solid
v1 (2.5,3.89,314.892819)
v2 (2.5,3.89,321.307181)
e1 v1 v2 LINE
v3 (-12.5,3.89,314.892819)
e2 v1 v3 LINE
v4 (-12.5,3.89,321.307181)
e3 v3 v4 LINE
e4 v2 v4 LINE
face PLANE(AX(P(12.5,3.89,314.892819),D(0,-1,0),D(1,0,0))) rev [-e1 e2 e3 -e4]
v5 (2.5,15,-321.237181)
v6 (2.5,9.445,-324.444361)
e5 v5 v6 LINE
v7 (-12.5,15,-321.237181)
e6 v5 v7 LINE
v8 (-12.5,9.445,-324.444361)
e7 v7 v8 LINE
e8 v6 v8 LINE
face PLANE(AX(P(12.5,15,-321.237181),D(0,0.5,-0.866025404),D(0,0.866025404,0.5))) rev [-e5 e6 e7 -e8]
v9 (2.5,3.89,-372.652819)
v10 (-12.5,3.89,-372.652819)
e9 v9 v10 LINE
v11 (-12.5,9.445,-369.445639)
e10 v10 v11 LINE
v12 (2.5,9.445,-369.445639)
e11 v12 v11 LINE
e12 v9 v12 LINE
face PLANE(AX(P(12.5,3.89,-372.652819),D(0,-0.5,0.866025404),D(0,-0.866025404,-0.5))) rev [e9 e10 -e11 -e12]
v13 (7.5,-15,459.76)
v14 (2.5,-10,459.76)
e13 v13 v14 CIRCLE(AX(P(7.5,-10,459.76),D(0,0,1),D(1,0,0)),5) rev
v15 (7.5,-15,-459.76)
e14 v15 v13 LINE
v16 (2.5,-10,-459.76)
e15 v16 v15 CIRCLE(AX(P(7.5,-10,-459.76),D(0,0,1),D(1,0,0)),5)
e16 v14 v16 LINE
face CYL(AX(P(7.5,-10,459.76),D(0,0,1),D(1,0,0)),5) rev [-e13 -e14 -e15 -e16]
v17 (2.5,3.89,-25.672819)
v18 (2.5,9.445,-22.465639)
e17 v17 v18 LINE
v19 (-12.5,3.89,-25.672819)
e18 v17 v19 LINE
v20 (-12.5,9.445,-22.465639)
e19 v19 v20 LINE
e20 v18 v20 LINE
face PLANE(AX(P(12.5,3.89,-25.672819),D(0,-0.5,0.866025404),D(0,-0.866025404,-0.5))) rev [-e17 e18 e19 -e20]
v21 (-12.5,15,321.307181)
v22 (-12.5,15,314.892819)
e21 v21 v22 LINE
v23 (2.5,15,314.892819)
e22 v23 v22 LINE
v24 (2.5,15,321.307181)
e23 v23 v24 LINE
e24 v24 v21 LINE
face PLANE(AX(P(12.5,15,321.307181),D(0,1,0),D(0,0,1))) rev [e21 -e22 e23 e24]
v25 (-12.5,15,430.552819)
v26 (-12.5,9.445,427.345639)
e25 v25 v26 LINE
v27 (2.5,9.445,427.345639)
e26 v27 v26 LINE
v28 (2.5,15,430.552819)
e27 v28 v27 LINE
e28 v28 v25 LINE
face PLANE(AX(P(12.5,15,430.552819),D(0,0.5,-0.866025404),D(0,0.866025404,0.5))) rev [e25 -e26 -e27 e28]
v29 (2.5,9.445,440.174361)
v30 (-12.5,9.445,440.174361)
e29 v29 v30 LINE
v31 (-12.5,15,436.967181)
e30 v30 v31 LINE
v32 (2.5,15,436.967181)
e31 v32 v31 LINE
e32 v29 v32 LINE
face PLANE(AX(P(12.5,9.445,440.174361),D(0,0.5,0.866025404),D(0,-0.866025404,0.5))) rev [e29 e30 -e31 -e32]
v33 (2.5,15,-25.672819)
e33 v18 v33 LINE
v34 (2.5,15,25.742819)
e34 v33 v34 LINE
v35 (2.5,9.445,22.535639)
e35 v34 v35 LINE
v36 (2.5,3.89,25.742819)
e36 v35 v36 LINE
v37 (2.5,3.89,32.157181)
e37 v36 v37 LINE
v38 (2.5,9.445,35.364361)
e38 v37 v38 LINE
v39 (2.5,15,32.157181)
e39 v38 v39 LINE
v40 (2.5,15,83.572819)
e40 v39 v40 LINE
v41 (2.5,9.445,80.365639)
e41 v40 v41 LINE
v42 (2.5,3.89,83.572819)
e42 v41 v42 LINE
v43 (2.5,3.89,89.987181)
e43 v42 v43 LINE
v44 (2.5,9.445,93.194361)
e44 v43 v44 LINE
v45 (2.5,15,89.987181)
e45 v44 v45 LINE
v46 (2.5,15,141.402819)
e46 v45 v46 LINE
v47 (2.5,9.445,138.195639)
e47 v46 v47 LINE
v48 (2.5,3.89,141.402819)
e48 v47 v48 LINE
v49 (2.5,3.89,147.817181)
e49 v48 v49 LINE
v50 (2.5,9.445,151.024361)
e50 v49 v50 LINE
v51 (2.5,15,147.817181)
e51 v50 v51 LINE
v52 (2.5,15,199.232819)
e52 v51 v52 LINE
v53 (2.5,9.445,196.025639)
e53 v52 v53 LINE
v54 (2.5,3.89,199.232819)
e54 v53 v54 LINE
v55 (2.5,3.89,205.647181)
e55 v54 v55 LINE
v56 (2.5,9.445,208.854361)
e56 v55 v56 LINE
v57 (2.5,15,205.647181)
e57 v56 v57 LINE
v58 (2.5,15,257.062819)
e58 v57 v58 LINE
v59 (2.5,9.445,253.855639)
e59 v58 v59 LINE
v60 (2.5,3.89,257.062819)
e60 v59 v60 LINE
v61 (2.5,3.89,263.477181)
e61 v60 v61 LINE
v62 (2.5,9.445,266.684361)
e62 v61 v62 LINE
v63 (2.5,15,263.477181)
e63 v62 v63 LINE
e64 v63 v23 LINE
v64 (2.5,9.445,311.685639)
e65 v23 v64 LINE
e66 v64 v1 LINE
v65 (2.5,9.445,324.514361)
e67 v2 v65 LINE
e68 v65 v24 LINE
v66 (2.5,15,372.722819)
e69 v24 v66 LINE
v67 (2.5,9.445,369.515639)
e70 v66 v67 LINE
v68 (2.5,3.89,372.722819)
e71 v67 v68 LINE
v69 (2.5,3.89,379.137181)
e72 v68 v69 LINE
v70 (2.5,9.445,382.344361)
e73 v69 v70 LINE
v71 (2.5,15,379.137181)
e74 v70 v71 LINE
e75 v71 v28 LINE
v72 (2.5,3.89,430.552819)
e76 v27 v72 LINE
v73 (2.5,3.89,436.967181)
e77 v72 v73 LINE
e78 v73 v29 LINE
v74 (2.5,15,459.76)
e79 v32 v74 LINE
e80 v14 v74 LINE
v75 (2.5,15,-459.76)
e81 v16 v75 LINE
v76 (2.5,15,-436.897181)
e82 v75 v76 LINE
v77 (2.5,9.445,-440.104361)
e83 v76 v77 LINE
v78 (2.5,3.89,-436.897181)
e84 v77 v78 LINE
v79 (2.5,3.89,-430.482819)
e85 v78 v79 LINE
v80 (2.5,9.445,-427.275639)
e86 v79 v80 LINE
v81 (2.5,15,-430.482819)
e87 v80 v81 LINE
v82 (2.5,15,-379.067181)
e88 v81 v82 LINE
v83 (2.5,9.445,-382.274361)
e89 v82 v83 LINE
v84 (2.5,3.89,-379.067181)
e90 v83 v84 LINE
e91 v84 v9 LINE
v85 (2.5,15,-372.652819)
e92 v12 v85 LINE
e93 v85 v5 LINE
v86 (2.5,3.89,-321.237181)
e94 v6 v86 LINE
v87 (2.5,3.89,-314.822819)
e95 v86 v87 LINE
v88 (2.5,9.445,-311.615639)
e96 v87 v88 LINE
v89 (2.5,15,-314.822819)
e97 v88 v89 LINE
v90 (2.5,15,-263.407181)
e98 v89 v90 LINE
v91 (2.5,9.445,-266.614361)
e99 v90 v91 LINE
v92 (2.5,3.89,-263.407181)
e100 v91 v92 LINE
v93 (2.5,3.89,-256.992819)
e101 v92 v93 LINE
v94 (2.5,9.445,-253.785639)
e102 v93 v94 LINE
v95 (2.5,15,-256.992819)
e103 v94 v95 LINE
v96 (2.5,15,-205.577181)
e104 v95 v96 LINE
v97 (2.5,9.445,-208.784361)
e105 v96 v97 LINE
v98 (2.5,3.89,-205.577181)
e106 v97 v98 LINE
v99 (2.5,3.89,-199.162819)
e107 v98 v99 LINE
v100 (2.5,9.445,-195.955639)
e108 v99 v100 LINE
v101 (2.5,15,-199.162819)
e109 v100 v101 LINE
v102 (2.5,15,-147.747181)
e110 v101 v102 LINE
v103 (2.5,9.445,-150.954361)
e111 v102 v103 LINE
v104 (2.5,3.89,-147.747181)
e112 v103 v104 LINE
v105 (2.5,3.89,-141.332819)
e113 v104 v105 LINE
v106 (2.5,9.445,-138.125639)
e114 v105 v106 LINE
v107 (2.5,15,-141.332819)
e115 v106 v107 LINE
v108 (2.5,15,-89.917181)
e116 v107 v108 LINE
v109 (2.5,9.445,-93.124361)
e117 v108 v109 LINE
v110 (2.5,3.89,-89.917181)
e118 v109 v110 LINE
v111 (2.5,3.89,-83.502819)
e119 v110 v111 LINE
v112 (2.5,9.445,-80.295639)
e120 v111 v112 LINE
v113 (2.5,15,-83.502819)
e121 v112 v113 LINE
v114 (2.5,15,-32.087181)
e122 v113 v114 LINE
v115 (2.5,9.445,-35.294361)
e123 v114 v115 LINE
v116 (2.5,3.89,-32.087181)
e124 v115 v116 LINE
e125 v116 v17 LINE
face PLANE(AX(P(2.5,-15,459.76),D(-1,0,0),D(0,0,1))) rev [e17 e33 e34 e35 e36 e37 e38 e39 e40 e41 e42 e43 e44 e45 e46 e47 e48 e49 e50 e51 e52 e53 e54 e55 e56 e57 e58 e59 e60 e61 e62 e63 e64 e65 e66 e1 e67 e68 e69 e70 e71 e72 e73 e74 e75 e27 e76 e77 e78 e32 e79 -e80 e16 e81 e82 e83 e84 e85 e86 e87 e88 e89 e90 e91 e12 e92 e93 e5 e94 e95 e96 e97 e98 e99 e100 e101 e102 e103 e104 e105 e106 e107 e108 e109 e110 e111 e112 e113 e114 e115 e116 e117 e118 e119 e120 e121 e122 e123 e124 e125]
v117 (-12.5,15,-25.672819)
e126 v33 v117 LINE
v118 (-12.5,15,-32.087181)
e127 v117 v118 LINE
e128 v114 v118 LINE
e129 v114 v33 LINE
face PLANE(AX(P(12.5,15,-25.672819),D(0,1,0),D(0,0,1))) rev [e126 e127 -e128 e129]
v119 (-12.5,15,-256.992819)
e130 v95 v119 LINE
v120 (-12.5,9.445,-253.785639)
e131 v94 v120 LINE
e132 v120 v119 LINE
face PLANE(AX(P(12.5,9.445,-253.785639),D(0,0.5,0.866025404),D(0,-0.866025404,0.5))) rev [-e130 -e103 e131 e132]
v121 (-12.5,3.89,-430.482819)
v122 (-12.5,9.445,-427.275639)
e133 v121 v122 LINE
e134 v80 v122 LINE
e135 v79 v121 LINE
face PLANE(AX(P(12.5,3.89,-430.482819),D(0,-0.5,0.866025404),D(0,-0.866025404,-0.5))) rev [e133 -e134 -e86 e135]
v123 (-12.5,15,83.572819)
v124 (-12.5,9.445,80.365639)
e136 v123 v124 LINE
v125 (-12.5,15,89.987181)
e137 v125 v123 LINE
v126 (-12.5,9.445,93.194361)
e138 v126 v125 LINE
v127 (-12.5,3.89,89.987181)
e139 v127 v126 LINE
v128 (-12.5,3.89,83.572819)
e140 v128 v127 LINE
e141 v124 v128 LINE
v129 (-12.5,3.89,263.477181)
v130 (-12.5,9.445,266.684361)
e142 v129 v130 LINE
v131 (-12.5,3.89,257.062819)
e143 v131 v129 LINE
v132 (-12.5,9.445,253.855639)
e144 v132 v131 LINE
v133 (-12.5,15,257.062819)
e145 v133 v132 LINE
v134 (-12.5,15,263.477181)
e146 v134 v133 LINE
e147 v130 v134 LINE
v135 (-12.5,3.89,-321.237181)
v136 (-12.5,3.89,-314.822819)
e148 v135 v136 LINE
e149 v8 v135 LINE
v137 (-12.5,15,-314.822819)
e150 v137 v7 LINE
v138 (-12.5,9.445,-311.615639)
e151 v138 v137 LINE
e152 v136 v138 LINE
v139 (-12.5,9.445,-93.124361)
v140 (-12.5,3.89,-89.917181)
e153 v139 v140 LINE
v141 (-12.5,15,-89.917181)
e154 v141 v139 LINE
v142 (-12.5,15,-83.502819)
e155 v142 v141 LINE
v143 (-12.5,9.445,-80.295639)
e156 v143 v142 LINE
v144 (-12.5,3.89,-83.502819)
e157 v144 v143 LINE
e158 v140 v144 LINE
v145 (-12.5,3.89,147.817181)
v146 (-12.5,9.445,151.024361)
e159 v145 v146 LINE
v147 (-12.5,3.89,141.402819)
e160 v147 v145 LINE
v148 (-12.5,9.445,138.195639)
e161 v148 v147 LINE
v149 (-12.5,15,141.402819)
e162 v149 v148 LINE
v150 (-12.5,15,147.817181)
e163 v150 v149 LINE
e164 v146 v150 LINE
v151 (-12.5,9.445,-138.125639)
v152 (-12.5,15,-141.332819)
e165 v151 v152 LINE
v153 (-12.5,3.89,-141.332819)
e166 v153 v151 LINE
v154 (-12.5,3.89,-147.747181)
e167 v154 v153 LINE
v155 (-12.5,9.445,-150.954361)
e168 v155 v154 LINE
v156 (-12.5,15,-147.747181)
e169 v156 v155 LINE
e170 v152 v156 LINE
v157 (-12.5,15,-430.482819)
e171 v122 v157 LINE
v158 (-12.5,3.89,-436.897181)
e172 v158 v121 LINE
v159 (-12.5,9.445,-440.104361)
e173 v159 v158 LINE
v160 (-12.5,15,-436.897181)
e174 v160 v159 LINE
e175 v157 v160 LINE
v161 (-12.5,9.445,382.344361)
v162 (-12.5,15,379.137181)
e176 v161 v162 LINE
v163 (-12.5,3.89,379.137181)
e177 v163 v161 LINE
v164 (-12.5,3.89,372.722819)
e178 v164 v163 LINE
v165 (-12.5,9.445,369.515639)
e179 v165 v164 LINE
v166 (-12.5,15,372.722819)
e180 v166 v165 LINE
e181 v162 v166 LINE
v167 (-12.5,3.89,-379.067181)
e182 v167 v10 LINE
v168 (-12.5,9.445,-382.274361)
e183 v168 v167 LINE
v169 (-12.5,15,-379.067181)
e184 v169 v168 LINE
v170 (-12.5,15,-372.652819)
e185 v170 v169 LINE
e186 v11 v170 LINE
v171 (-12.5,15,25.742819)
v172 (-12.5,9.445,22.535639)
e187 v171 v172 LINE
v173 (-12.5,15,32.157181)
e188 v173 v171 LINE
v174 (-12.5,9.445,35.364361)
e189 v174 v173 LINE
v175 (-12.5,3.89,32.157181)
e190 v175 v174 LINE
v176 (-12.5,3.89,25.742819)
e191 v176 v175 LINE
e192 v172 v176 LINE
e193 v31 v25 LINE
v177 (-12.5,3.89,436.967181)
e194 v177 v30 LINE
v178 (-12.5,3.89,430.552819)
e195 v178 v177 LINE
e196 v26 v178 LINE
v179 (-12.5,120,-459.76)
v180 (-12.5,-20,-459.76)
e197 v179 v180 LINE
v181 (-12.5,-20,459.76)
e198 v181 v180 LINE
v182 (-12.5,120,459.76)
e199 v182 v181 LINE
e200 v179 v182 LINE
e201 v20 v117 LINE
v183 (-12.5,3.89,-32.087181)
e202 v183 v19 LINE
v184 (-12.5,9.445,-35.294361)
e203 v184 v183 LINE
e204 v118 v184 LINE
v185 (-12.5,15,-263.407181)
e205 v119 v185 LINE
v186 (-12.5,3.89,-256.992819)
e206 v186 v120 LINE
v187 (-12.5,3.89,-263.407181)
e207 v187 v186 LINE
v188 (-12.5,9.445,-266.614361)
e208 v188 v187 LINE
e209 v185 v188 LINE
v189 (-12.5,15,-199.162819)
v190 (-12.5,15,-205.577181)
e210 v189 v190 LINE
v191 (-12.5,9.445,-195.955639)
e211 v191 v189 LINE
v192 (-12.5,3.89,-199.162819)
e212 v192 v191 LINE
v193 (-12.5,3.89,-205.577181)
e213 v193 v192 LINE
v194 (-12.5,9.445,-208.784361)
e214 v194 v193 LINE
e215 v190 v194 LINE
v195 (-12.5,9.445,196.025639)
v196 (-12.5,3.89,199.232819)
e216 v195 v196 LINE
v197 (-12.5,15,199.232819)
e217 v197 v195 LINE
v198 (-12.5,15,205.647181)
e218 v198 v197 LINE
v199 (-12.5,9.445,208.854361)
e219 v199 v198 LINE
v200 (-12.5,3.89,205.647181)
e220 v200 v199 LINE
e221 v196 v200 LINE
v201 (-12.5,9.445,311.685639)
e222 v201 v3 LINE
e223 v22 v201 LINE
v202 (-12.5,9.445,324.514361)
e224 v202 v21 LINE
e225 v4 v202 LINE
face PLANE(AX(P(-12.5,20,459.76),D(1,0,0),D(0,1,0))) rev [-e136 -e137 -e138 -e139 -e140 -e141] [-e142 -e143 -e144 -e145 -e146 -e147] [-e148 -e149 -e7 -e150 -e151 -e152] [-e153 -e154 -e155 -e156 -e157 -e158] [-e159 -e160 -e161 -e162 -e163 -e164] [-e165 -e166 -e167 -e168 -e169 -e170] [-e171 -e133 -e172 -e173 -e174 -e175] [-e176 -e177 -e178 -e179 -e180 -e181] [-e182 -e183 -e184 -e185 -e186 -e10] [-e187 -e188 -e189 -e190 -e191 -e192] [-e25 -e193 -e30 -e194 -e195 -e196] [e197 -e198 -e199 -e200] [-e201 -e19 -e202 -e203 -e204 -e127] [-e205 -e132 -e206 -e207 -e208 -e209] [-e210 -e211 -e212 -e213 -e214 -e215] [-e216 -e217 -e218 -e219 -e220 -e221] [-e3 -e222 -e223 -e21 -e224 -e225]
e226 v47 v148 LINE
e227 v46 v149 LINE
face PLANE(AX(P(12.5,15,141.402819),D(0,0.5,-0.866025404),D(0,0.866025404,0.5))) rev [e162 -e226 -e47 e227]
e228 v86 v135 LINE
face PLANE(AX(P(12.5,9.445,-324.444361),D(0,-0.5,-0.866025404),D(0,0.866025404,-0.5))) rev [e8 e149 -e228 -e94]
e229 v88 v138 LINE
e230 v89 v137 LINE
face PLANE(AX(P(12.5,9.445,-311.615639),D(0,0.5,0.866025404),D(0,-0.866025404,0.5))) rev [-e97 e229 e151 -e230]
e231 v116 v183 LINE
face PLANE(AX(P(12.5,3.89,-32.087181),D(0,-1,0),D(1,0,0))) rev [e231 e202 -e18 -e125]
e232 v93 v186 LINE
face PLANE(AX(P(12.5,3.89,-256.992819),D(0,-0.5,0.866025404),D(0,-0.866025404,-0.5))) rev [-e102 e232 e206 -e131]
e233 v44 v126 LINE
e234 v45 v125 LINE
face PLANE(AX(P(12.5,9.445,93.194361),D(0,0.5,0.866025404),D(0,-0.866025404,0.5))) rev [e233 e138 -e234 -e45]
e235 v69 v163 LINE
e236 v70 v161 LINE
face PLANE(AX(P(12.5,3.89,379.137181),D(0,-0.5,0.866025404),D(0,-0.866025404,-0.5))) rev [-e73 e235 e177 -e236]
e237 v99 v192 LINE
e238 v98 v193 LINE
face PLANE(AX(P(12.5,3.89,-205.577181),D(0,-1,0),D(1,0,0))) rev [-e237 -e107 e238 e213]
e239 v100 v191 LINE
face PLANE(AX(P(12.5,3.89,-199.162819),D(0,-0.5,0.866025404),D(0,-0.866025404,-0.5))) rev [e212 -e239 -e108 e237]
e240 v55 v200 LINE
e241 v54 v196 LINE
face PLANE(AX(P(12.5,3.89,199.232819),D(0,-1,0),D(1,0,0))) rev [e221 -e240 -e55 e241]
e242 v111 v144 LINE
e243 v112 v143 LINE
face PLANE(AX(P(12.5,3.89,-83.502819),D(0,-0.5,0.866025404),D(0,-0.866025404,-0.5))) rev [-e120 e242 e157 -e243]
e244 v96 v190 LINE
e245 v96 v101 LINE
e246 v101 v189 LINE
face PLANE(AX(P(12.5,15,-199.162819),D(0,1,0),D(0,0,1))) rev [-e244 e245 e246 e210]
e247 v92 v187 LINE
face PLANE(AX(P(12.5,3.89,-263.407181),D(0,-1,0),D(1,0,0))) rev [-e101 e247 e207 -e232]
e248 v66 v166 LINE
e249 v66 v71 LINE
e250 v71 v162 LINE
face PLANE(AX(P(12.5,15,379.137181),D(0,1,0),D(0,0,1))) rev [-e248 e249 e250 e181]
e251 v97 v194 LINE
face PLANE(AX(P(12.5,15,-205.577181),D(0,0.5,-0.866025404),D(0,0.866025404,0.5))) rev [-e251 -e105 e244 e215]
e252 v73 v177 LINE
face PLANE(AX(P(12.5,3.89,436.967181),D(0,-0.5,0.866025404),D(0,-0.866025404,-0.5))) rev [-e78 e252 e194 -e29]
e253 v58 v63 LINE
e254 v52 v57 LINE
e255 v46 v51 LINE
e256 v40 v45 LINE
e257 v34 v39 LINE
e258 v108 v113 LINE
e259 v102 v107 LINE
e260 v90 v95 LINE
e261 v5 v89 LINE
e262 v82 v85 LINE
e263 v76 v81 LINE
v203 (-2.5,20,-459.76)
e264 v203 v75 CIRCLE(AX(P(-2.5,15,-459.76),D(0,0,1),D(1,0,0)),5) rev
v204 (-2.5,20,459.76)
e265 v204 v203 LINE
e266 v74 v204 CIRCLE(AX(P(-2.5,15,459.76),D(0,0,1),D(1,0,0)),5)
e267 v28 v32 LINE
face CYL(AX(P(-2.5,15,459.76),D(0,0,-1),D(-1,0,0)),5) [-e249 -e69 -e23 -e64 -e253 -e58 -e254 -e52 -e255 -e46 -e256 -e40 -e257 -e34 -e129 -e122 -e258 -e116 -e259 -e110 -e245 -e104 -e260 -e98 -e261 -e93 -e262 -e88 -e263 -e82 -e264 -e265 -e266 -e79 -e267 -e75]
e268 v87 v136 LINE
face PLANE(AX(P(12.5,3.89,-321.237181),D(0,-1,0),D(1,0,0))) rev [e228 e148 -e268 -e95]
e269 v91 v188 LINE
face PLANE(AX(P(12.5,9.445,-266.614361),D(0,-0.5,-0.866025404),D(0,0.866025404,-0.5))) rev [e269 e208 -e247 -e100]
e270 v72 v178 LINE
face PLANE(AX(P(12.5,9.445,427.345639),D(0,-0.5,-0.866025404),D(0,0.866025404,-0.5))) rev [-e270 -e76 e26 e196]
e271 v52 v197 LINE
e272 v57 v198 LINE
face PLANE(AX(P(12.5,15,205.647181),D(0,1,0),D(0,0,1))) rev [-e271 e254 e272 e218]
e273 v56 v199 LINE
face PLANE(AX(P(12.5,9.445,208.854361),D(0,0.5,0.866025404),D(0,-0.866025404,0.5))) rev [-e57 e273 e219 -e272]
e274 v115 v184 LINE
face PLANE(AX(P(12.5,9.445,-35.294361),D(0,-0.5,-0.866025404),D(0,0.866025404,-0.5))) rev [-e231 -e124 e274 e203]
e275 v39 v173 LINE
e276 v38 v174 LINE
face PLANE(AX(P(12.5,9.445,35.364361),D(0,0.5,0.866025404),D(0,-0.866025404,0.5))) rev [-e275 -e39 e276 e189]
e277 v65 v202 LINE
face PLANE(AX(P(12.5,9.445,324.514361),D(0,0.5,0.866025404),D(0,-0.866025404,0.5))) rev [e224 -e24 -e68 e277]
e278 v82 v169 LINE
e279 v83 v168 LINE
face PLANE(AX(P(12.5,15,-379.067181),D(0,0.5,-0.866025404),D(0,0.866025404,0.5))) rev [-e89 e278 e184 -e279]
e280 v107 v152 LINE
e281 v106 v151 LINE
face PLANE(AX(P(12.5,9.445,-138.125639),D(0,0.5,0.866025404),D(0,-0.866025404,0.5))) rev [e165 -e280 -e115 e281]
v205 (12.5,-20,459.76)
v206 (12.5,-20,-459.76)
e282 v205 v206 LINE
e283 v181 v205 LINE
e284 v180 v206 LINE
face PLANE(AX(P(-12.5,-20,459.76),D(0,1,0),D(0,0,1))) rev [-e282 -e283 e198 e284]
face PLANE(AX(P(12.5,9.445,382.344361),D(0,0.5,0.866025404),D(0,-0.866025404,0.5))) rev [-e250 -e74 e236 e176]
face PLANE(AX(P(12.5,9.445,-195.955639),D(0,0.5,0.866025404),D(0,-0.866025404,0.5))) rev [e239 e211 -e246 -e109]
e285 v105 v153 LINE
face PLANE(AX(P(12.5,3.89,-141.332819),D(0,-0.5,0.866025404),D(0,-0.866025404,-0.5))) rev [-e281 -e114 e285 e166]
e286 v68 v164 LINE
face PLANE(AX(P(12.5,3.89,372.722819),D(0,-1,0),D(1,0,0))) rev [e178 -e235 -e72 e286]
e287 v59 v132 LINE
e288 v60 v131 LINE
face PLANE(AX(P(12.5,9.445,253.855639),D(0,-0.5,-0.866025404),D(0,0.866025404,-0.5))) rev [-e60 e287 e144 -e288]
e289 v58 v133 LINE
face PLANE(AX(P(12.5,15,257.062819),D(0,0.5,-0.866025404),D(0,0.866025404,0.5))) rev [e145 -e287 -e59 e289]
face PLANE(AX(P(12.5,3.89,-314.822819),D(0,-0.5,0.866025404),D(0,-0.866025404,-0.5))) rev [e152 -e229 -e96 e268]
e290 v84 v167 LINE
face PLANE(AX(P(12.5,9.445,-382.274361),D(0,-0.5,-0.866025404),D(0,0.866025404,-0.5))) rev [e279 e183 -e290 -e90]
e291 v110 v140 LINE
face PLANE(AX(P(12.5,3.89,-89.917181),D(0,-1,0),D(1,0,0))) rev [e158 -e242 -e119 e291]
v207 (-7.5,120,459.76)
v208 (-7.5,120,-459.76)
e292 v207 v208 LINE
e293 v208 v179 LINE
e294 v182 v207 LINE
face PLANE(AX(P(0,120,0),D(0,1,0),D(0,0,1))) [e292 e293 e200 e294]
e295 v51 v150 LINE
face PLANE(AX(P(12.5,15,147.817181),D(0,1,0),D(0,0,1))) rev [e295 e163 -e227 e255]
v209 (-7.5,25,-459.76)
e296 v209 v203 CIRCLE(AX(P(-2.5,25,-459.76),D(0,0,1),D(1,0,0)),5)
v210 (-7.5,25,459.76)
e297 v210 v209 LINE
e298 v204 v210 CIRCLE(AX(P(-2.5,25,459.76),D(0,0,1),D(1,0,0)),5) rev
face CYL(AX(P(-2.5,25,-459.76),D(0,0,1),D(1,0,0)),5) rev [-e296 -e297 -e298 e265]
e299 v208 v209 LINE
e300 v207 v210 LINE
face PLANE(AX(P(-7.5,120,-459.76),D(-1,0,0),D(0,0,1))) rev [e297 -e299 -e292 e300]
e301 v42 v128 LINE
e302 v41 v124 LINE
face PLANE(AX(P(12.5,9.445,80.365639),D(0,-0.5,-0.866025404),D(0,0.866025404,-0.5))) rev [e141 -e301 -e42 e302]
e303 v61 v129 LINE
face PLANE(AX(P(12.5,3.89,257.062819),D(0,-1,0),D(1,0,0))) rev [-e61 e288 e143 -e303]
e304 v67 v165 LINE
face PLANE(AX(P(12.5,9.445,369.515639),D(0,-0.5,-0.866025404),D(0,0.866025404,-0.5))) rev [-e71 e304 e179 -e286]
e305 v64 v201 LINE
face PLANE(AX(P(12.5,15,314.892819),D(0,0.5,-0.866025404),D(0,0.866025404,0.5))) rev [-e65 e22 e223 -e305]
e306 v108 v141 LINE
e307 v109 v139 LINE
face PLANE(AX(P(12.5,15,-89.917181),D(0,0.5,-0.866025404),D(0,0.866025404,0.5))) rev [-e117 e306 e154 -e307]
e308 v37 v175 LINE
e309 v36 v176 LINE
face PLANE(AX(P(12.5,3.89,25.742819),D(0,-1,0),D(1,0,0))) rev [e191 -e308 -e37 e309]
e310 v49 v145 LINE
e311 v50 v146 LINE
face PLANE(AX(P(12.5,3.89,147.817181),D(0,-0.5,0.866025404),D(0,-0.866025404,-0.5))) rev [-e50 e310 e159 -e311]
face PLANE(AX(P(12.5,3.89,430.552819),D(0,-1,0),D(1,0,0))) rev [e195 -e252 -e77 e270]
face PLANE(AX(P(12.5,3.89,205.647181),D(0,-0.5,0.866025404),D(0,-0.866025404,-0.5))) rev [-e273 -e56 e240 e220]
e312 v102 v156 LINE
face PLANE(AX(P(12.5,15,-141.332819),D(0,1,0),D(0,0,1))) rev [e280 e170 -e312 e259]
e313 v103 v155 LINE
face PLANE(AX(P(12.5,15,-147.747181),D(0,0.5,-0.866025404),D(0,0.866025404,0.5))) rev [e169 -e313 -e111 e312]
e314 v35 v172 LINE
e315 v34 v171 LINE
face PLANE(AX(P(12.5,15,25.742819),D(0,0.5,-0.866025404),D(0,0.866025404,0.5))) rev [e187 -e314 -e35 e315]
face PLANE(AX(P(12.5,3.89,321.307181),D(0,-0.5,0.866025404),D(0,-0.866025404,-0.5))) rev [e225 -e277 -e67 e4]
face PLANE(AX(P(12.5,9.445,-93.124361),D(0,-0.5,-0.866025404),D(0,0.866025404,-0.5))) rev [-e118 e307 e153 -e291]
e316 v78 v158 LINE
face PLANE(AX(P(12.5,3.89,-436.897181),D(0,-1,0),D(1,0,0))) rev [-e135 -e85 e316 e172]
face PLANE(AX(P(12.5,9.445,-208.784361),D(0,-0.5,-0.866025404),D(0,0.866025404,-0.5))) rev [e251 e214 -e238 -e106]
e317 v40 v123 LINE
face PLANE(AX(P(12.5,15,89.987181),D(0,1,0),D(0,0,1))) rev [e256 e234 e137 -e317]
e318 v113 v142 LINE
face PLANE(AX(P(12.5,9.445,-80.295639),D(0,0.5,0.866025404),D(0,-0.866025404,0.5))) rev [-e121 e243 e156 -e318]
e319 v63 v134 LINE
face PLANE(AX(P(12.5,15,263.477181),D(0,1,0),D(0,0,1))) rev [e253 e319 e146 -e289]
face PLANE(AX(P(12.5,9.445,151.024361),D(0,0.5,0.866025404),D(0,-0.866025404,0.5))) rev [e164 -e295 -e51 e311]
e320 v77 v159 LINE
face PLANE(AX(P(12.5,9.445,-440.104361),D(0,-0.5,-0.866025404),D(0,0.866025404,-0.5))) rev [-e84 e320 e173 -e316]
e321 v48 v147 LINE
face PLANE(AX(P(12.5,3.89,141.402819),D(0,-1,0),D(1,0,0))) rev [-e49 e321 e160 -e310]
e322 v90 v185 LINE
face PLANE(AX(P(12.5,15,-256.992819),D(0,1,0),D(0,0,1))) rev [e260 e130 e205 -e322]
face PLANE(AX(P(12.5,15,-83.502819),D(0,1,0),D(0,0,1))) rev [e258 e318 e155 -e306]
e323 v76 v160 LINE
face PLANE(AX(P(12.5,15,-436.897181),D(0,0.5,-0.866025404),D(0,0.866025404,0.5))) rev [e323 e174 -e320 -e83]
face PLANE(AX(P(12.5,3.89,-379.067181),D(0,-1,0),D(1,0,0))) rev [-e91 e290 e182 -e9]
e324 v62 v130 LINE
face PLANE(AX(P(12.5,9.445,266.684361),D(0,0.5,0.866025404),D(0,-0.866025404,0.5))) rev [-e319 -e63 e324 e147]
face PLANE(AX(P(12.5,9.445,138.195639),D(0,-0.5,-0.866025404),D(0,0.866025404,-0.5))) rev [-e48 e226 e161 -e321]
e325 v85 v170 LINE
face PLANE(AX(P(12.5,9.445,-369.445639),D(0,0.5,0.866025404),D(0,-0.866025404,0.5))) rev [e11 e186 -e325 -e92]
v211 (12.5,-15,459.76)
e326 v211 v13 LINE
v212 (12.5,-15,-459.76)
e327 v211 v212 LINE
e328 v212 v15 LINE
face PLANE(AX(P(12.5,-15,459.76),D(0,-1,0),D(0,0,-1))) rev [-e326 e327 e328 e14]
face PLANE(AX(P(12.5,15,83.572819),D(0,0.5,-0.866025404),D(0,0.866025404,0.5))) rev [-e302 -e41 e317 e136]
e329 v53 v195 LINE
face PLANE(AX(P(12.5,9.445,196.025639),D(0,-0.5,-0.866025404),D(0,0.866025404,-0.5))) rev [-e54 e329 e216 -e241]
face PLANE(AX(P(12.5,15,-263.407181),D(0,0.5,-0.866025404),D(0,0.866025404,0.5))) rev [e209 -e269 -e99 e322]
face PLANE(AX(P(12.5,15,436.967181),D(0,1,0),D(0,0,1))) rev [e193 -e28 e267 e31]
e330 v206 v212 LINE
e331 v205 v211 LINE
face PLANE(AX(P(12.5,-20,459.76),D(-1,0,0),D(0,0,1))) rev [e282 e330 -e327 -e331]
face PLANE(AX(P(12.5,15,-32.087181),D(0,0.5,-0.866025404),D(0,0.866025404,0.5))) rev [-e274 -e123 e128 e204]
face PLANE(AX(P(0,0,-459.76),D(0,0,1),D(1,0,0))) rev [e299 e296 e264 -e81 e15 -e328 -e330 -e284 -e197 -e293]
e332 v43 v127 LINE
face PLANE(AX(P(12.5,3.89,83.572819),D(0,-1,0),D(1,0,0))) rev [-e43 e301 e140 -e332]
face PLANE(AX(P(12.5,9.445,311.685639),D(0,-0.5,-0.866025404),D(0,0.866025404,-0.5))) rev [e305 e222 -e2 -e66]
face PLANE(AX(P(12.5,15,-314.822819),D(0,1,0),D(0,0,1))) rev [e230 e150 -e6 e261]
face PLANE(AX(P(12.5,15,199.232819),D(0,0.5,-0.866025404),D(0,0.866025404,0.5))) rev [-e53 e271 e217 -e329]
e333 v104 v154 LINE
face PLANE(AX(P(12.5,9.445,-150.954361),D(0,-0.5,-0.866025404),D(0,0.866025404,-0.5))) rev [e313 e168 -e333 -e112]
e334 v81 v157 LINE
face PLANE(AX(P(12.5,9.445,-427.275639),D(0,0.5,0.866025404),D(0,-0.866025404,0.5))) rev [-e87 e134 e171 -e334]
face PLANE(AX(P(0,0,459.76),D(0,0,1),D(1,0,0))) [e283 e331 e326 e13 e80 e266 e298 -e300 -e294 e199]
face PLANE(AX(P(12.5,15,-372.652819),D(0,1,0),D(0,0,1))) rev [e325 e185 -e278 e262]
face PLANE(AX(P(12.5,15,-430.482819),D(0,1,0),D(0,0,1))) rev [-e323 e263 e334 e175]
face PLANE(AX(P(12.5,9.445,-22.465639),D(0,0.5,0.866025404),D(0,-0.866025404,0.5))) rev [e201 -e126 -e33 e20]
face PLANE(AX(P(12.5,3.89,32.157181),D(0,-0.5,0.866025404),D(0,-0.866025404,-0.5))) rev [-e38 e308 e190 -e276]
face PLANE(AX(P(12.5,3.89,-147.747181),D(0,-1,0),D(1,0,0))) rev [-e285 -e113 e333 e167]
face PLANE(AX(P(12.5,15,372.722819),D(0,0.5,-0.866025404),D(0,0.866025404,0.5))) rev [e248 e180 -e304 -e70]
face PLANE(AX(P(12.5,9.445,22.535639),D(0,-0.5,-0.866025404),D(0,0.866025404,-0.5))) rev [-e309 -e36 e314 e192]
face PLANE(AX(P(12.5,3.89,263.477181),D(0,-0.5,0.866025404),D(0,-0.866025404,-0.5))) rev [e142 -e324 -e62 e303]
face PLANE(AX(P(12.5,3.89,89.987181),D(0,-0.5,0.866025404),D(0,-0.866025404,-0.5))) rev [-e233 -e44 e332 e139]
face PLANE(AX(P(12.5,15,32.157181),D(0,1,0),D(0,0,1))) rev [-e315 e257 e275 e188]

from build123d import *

# Parameters (mm, degrees)
GENERAL_EXTRUDE_DEPTH       = 459.76
ROUNDING_R                  = 5
ROLLER_HOLDERS_DEPTH        = 461.873363952
SKETCH5_W                   = 5
SKETCH5_H                   = 919.52
GUARD_RAIL_DEPTH            = 100
GUARD_RAIL_SUPPORT_FILLET_R = 5


with BuildPart() as part:
    # Sketch2 → General extrude (new, symmetric)
    with BuildSketch(Plane.XY):
        Polygon((-12.5, 20), (-12.5, -20), (12.5, -20), (12.5, -15), (2.5, -15), (2.5, 20), align=None)
    extrude(amount=GENERAL_EXTRUDE_DEPTH, both=True)

    # Rounding
    rounding_edges = [part.edges().sort_by_distance(p)[0] for p in [
        (2.5, 20, 0),
        (2.5, -15, 0),
    ]]
    fillet(rounding_edges, radius=ROUNDING_R)

    # Sketch3 → Roller holders (cut, through all)
    with BuildSketch(Plane.ZY.offset(12.5)):
        Polygon((436.967180745, 3.89), (440.174361491, 9.445), (436.967180745, 15), (430.552819255, 15), (427.345638509, 9.445), (430.552819255, 3.89), align=None)
        Polygon((379.137180745, 3.89), (382.344361491, 9.445), (379.137180745, 15), (372.722819255, 15), (369.515638509, 9.445), (372.722819255, 3.89), align=None)
        Polygon((321.307180745, 3.89), (324.514361491, 9.445), (321.307180745, 15), (314.892819255, 15), (311.685638509, 9.445), (314.892819255, 3.89), align=None)
        Polygon((263.477180745, 3.89), (266.684361491, 9.445), (263.477180745, 15), (257.062819255, 15), (253.855638509, 9.445), (257.062819255, 3.89), align=None)
        Polygon((205.647180745, 3.89), (208.854361491, 9.445), (205.647180745, 15), (199.232819255, 15), (196.025638509, 9.445), (199.232819255, 3.89), align=None)
        Polygon((147.817180745, 3.89), (151.024361491, 9.445), (147.817180745, 15), (141.402819255, 15), (138.195638509, 9.445), (141.402819255, 3.89), align=None)
        Polygon((89.987180745, 3.89), (93.194361491, 9.445), (89.987180745, 15), (83.572819255, 15), (80.365638509, 9.445), (83.572819255, 3.89), align=None)
        Polygon((32.157180745, 3.89), (35.364361491, 9.445), (32.157180745, 15), (25.742819255, 15), (22.535638509, 9.445), (25.742819255, 3.89), align=None)
        Polygon((-25.672819255, 3.89), (-22.465638509, 9.445), (-25.672819255, 15), (-32.087180745, 15), (-35.294361491, 9.445), (-32.087180745, 3.89), align=None)
        Polygon((-83.502819255, 3.89), (-80.295638509, 9.445), (-83.502819255, 15), (-89.917180745, 15), (-93.124361491, 9.445), (-89.917180745, 3.89), align=None)
        Polygon((-141.332819255, 3.89), (-138.125638509, 9.445), (-141.332819255, 15), (-147.747180745, 15), (-150.954361491, 9.445), (-147.747180745, 3.89), align=None)
        Polygon((-199.162819255, 3.89), (-195.955638509, 9.445), (-199.162819255, 15), (-205.577180745, 15), (-208.784361491, 9.445), (-205.577180745, 3.89), align=None)
        Polygon((-256.992819255, 3.89), (-253.785638509, 9.445), (-256.992819255, 15), (-263.407180745, 15), (-266.614361491, 9.445), (-263.407180745, 3.89), align=None)
        Polygon((-314.822819255, 3.89), (-311.615638509, 9.445), (-314.822819255, 15), (-321.237180745, 15), (-324.444361491, 9.445), (-321.237180745, 3.89), align=None)
        Polygon((-372.652819255, 3.89), (-369.445638509, 9.445), (-372.652819255, 15), (-379.067180745, 15), (-382.274361491, 9.445), (-379.067180745, 3.89), align=None)
        Polygon((-430.482819255, 3.89), (-427.275638509, 9.445), (-430.482819255, 15), (-436.897180745, 15), (-440.104361491, 9.445), (-436.897180745, 3.89), align=None)
    extrude(amount=-ROLLER_HOLDERS_DEPTH, mode=Mode.SUBTRACT)

    # Sketch5 → Guard rail (add)
    with BuildSketch(Plane(origin=(0, 20, 0), x_dir=(1, 0, 0), z_dir=(0, 1, 0))):
        with Locations((-10, 0)):
            Rectangle(SKETCH5_W, SKETCH5_H)
    extrude(amount=GUARD_RAIL_DEPTH)

    # Guard rail support fillet
    guard_rail_support_fillet_edges = [part.edges().sort_by_distance(p)[0] for p in [
        (-7.5, 20, 0),
    ]]
    fillet(guard_rail_support_fillet_edges, radius=GUARD_RAIL_SUPPORT_FILLET_R - 0.0001)  # a hair under: the kernel refuses the full size


solid = part.part
